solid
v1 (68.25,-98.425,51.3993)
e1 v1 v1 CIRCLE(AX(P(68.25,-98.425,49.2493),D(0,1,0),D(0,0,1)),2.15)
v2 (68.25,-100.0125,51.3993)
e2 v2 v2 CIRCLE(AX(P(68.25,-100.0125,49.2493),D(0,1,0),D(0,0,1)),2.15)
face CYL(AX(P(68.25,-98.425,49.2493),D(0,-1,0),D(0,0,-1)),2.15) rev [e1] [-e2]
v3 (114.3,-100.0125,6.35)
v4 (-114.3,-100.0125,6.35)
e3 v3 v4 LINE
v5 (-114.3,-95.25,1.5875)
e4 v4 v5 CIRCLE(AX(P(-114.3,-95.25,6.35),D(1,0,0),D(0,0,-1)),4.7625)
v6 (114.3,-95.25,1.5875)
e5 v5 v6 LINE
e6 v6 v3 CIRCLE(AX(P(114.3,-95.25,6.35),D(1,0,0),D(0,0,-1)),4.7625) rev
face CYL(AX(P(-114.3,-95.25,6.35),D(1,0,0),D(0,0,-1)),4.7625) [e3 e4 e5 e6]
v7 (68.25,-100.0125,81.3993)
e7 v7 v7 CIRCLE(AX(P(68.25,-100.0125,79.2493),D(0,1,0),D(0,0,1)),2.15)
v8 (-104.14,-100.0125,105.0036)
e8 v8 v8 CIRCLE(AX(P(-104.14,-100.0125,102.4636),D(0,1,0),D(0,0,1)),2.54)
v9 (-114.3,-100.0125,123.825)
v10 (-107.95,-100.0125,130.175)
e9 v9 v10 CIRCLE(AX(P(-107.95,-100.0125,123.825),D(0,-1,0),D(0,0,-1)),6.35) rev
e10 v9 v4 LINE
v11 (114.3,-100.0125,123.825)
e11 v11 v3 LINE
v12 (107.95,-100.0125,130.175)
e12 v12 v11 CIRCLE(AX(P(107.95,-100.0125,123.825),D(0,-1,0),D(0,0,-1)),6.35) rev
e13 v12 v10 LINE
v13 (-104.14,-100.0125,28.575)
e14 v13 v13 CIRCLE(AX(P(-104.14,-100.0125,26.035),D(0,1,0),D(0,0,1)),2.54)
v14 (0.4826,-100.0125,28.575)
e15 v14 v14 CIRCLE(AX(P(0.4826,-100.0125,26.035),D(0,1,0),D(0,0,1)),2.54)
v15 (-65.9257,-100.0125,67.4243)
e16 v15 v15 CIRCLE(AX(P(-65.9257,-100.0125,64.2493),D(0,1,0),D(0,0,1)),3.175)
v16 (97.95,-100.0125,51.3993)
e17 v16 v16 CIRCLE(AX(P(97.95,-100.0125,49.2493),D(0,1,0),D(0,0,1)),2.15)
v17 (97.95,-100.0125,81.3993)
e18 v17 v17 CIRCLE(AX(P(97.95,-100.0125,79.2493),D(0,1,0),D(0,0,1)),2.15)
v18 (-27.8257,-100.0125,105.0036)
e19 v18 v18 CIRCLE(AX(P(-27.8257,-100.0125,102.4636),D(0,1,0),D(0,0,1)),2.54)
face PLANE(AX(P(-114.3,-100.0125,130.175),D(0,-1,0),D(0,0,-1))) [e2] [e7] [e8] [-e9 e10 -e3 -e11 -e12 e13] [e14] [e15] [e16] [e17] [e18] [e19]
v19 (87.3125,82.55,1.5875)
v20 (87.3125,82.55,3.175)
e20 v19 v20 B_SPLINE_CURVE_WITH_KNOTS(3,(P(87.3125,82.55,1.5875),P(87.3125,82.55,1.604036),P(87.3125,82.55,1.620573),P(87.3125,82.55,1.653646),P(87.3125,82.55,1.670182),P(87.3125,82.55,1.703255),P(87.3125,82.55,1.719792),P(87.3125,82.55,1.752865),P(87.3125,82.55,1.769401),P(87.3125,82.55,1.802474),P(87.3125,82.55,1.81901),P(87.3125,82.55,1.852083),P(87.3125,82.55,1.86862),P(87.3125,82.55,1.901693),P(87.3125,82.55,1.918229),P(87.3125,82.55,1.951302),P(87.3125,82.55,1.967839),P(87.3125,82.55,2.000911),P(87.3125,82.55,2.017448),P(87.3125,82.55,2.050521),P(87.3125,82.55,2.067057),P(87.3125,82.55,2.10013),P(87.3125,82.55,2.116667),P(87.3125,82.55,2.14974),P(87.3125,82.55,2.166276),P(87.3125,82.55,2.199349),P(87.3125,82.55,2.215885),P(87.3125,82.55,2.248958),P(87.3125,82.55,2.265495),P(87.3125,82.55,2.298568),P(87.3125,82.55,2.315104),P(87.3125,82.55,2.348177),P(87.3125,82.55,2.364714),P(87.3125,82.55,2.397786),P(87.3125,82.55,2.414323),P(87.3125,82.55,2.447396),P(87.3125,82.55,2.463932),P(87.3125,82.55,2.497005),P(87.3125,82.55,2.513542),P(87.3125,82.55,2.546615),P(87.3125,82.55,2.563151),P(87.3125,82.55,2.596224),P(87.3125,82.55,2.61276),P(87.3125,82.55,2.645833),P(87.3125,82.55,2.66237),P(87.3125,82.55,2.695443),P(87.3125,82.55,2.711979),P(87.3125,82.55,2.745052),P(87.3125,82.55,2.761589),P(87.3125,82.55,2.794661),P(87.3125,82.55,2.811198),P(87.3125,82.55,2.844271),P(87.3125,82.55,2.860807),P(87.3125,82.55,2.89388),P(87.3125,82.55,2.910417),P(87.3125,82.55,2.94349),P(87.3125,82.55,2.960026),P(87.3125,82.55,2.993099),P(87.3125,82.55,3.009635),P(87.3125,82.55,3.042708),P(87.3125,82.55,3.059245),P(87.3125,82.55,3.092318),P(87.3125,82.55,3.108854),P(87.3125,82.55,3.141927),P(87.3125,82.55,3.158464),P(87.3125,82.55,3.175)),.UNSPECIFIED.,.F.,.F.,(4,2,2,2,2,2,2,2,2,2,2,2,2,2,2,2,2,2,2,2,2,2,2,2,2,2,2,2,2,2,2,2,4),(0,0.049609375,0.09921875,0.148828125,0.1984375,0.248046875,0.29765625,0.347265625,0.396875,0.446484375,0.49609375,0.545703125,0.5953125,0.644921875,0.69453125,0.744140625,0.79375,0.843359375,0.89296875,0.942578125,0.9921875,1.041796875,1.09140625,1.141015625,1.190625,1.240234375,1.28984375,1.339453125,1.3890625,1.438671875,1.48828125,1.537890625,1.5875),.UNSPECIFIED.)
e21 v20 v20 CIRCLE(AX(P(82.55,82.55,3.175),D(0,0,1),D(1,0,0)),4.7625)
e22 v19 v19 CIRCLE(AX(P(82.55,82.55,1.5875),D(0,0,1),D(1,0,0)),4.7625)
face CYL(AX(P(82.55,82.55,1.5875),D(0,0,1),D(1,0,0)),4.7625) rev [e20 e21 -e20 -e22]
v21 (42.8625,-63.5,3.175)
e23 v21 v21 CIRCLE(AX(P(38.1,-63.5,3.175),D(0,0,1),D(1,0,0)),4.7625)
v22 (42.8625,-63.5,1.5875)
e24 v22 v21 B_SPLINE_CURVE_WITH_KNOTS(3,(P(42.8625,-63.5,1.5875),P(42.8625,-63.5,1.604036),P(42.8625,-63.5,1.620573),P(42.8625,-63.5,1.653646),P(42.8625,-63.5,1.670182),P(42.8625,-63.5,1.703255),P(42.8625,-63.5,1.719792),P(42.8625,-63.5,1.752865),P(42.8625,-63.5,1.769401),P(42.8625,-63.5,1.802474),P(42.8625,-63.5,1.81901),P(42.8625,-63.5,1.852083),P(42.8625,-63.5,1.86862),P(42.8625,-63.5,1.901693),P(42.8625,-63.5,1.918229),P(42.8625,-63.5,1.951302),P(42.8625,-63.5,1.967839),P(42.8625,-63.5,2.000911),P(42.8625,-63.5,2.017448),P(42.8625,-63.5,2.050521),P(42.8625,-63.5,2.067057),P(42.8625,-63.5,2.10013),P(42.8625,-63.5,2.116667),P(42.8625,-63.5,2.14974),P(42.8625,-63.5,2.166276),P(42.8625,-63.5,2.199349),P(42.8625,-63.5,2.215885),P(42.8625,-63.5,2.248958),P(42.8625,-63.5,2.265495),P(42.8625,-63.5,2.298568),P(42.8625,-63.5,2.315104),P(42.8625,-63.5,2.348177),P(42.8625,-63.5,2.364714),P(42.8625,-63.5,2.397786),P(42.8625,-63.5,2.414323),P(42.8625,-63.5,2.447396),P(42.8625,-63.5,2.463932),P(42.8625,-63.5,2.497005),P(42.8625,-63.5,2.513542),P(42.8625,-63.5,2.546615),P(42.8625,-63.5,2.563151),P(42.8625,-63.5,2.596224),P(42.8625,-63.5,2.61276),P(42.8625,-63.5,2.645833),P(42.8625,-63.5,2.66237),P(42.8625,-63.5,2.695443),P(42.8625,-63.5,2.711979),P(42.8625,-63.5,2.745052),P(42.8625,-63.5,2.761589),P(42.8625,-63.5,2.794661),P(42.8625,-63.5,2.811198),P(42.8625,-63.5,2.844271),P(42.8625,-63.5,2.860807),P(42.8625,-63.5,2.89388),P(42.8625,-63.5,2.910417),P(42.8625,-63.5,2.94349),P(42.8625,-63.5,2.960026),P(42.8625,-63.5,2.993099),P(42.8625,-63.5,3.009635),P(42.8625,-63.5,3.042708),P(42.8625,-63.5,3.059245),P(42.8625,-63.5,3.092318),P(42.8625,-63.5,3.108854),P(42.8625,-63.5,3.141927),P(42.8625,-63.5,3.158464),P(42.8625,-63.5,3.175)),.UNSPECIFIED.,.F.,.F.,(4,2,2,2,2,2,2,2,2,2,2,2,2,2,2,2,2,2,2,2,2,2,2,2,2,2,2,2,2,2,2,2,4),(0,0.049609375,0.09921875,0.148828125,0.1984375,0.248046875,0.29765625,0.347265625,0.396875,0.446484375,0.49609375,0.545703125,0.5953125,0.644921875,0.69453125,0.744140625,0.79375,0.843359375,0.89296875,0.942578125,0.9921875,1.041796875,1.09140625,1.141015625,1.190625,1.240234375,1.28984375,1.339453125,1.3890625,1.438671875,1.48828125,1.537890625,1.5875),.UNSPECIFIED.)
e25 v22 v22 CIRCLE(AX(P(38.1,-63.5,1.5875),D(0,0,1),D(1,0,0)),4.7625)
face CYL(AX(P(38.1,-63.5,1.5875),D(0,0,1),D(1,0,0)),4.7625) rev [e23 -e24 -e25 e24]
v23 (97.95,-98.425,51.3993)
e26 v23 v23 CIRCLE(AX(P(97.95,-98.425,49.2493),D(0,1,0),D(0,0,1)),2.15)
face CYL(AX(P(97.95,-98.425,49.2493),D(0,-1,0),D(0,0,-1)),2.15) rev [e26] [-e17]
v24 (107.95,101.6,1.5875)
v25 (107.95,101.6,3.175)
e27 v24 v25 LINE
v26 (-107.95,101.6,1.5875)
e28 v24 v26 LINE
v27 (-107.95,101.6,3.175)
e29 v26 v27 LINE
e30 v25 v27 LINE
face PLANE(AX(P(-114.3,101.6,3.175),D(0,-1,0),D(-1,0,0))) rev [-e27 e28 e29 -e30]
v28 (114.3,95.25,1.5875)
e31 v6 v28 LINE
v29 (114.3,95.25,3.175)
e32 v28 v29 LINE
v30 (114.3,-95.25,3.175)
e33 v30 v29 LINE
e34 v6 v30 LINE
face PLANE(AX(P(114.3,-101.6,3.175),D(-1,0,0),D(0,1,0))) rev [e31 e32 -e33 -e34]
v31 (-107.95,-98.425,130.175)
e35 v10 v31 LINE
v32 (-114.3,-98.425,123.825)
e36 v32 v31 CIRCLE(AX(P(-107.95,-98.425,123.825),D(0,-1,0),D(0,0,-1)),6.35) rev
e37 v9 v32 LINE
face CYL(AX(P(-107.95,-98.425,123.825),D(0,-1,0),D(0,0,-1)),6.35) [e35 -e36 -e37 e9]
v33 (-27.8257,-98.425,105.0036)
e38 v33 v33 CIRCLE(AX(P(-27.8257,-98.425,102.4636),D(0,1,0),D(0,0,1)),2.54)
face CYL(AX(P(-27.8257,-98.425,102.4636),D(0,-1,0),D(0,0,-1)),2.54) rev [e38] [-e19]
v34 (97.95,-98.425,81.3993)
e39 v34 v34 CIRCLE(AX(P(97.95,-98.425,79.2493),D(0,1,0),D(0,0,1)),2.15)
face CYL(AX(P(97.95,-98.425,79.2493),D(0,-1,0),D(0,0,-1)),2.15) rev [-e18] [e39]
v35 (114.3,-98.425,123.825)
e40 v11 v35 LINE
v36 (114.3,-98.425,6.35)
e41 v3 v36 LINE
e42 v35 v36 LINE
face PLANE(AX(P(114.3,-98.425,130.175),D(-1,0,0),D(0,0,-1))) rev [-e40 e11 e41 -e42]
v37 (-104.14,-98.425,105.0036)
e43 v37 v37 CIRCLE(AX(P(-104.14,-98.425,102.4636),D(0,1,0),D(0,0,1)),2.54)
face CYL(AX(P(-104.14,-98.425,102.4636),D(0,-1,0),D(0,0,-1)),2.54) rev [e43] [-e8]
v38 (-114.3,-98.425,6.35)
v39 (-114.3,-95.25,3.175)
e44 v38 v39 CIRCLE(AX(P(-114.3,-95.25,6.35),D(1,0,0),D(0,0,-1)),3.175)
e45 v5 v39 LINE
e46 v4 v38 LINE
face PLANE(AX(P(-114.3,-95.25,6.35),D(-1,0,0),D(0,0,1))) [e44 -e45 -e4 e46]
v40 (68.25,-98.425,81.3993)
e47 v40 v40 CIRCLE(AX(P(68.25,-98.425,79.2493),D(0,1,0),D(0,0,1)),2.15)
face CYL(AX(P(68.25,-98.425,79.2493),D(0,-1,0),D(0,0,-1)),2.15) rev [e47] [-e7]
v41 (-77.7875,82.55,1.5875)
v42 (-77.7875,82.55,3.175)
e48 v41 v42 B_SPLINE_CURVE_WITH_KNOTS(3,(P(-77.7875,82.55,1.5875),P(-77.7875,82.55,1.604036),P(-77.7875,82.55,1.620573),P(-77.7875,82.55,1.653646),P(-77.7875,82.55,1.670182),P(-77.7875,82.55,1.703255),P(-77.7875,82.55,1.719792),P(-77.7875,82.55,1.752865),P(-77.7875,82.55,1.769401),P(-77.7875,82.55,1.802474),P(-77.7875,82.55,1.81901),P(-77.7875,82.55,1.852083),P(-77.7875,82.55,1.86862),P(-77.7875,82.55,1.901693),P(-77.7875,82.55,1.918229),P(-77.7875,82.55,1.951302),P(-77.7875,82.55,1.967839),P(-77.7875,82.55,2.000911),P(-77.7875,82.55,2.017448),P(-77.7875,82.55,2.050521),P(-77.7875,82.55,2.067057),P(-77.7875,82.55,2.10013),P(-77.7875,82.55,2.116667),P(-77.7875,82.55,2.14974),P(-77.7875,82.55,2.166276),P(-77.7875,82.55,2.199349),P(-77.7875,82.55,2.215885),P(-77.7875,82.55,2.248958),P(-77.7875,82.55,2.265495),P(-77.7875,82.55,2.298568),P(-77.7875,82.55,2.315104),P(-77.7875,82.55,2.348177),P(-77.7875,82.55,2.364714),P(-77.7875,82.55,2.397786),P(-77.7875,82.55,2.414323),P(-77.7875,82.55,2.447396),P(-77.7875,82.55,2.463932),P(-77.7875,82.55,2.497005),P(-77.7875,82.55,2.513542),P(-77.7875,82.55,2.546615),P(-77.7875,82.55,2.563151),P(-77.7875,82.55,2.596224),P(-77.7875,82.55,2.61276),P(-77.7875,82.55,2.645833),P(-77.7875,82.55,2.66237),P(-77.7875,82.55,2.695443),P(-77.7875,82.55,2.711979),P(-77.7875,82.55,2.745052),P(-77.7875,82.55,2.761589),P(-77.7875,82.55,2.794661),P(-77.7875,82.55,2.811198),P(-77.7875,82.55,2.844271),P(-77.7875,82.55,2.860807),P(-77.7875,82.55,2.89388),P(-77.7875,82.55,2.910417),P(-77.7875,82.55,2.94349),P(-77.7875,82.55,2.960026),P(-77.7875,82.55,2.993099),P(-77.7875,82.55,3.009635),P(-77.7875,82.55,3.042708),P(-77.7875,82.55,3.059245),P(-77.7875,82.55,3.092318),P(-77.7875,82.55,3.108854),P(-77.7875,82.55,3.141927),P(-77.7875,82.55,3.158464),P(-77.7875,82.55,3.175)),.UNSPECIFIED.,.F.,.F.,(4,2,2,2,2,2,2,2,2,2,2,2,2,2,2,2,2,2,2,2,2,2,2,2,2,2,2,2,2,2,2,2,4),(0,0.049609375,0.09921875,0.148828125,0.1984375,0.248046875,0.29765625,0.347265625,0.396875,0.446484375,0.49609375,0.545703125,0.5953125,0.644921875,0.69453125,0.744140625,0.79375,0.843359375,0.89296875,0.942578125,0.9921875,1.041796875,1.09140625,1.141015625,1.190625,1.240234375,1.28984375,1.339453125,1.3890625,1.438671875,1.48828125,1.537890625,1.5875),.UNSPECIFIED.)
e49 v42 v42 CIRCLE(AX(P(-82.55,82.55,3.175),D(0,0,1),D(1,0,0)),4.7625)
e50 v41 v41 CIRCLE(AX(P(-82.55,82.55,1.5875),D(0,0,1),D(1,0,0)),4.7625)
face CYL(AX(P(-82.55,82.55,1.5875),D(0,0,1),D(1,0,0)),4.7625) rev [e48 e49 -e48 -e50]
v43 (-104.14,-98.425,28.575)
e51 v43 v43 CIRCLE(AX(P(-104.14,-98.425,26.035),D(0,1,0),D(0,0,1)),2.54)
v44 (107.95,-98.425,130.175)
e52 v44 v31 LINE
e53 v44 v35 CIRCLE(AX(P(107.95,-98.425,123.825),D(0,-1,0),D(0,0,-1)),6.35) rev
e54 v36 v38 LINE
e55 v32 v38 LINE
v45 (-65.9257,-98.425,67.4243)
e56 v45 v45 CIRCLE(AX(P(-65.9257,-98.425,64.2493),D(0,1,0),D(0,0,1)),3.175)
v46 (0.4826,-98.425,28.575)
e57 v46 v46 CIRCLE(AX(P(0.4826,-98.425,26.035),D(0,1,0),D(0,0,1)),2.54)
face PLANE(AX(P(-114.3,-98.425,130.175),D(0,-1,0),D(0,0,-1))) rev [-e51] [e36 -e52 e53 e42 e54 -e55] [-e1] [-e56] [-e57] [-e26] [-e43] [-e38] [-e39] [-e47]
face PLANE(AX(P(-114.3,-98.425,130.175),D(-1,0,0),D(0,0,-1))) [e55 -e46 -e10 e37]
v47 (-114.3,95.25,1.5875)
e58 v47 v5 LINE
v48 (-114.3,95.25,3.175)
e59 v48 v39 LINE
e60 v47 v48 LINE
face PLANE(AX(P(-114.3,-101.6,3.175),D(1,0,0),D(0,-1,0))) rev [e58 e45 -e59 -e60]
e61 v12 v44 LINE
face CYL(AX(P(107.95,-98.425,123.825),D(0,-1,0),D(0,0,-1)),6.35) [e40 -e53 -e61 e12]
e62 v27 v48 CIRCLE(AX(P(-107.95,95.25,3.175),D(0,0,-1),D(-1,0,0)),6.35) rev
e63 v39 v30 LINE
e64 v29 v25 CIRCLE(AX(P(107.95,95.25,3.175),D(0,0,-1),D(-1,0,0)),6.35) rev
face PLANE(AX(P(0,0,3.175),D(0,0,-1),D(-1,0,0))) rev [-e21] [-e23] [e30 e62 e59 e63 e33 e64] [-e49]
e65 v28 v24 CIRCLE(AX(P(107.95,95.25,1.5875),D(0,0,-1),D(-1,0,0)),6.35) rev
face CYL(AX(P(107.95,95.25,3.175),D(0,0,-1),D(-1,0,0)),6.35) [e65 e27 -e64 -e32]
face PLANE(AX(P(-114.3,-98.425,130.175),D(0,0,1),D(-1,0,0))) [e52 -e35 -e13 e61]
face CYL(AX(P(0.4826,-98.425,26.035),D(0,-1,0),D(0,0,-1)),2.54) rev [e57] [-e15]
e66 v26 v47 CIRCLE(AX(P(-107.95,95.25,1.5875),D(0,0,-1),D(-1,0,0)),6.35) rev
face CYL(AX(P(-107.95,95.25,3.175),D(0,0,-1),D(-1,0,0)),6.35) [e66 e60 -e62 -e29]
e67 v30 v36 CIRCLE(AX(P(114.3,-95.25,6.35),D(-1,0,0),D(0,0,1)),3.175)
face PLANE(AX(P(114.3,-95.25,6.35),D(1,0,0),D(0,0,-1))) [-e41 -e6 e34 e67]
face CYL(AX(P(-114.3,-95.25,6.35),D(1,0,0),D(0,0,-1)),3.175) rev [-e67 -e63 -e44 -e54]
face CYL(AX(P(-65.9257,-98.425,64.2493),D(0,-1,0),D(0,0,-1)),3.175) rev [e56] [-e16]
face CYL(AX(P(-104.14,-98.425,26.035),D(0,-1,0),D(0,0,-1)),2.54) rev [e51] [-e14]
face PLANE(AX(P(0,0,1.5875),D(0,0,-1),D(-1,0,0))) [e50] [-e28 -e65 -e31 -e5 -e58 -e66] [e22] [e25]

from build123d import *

# Parameters (mm, degrees)
SKETCH2_W            = 228.6
SKETCH2_H            = 203.2
BOSS_EXTRUDE1_DEPTH  = 3.175
SKETCH3_W            = 228.6
SKETCH3_H            = 3.175
BOSS_EXTRUDE2_DEPTH  = 127
FILLET1_R            = 3.175
FILLET2_R            = 6.35
SKETCH4_R            = 2.54
SKETCH4_R_2          = 2.15
SKETCH4_R_3          = 3.175
CUT_EXTRUDE1_DEPTH   = 265.612965007
CONVERT_SOLID1_START = -114.3
CONVERT_SOLID1_DEPTH = 228.6
SKETCH9_R            = 4.7625
CUT_EXTRUDE2_DEPTH   = 199.7864432


# Read off the part's stored shape, not the designer's step: Convert-Solid1
with BuildPart() as part:
    # Sketch2 → Boss-Extrude1 (new body)
    with BuildSketch(Plane.XY):
        Rectangle(SKETCH2_W, SKETCH2_H)
    extrude(amount=BOSS_EXTRUDE1_DEPTH)

    # Sketch3 → Boss-Extrude2 (add)
    with BuildSketch(Plane.XY.offset(3.175)):
        with Locations((0, -100.0125)):
            Rectangle(SKETCH3_W, SKETCH3_H)
    extrude(amount=BOSS_EXTRUDE2_DEPTH)

    # Fillet1
    fillet1_edges = [part.edges().sort_by_distance(p)[0] for p in [
        (0, -98.425, 3.175),
        (0, -101.6, 0),
    ]]
    fillet(fillet1_edges, radius=FILLET1_R)

    # Fillet2
    fillet2_edges = [part.edges().sort_by_distance(p)[0] for p in [
        (-114.3, -100.0125, 130.175),
        (114.3, -100.0125, 130.175),
        (-114.3, 101.6, 1.5875),
        (114.3, 101.6, 1.5875),
    ]]
    fillet(fillet2_edges, radius=FILLET2_R)

    # Sketch4 → Cut-Extrude1 (cut, through all)
    with BuildSketch(Plane(origin=(0, -98.425, 0), x_dir=(1, 0, 0), z_dir=(0, 1, 0))):
        with Locations(Location((-104.14, -26.035, 0), (0, 0, 270))):
            Circle(SKETCH4_R)
        with Locations(Location((-104.14, -102.4636, 0), (0, 0, 270))):
            Circle(SKETCH4_R)
        with Locations(Location((0.4826, -26.035, 0), (0, 0, 270))):
            Circle(SKETCH4_R)
        with Locations(Location((-27.8257, -102.4636, 0), (0, 0, 270))):
            Circle(SKETCH4_R)
        with Locations(Location((68.25, -79.2493, 0), (0, 0, 270))):
            Circle(SKETCH4_R_2)
        with Locations(Location((97.95, -79.2493, 0), (0, 0, 270))):
            Circle(SKETCH4_R_2)
        with Locations(Location((68.25, -49.2493, 0), (0, 0, 270))):
            Circle(SKETCH4_R_2)
        with Locations(Location((97.95, -49.2493, 0), (0, 0, 270))):
            Circle(SKETCH4_R_2)
        with Locations(Location((-65.9257, -64.2493, 0), (0, 0, 270))):
            Circle(SKETCH4_R_3)
    extrude(amount=-CUT_EXTRUDE1_DEPTH, mode=Mode.SUBTRACT)

    # Convert-Solid1 outline → Convert-Solid1 (cut)
    with BuildSketch(Plane.YZ.offset(CONVERT_SOLID1_START)):
        with BuildLine():
            ThreePointArc((-95.25, 1.5875), (-98.617596045, 2.982403955), (-100.0125, 6.35))
            Line((-100.0125, 6.35), (-100.0125, 130.175))
            Line((-100.0125, 130.175), (-101.6, 130.175))
            Line((-101.6, 130.175), (-101.6, 3.175))
            ThreePointArc((-101.6, 3.175), (-100.67006403, 0.92993597), (-98.425, 0))
            Line((-98.425, 0), (101.6, 0))
            Line((101.6, 0), (101.6, 1.5875))
            Line((101.6, 1.5875), (-95.25, 1.5875))
        make_face()
    extrude(amount=CONVERT_SOLID1_DEPTH, mode=Mode.SUBTRACT)

    # Sketch9 → Cut-Extrude2 (cut, through all)
    with BuildSketch(Plane.XY.offset(3.175)):
        with Locations((-82.55, 82.55)):
            Circle(SKETCH9_R)
        with Locations((82.55, 82.55)):
            Circle(SKETCH9_R)
        with Locations((38.1, -63.5)):
            Circle(SKETCH9_R)
    extrude(amount=-CUT_EXTRUDE2_DEPTH, mode=Mode.SUBTRACT)


solid = part.part
